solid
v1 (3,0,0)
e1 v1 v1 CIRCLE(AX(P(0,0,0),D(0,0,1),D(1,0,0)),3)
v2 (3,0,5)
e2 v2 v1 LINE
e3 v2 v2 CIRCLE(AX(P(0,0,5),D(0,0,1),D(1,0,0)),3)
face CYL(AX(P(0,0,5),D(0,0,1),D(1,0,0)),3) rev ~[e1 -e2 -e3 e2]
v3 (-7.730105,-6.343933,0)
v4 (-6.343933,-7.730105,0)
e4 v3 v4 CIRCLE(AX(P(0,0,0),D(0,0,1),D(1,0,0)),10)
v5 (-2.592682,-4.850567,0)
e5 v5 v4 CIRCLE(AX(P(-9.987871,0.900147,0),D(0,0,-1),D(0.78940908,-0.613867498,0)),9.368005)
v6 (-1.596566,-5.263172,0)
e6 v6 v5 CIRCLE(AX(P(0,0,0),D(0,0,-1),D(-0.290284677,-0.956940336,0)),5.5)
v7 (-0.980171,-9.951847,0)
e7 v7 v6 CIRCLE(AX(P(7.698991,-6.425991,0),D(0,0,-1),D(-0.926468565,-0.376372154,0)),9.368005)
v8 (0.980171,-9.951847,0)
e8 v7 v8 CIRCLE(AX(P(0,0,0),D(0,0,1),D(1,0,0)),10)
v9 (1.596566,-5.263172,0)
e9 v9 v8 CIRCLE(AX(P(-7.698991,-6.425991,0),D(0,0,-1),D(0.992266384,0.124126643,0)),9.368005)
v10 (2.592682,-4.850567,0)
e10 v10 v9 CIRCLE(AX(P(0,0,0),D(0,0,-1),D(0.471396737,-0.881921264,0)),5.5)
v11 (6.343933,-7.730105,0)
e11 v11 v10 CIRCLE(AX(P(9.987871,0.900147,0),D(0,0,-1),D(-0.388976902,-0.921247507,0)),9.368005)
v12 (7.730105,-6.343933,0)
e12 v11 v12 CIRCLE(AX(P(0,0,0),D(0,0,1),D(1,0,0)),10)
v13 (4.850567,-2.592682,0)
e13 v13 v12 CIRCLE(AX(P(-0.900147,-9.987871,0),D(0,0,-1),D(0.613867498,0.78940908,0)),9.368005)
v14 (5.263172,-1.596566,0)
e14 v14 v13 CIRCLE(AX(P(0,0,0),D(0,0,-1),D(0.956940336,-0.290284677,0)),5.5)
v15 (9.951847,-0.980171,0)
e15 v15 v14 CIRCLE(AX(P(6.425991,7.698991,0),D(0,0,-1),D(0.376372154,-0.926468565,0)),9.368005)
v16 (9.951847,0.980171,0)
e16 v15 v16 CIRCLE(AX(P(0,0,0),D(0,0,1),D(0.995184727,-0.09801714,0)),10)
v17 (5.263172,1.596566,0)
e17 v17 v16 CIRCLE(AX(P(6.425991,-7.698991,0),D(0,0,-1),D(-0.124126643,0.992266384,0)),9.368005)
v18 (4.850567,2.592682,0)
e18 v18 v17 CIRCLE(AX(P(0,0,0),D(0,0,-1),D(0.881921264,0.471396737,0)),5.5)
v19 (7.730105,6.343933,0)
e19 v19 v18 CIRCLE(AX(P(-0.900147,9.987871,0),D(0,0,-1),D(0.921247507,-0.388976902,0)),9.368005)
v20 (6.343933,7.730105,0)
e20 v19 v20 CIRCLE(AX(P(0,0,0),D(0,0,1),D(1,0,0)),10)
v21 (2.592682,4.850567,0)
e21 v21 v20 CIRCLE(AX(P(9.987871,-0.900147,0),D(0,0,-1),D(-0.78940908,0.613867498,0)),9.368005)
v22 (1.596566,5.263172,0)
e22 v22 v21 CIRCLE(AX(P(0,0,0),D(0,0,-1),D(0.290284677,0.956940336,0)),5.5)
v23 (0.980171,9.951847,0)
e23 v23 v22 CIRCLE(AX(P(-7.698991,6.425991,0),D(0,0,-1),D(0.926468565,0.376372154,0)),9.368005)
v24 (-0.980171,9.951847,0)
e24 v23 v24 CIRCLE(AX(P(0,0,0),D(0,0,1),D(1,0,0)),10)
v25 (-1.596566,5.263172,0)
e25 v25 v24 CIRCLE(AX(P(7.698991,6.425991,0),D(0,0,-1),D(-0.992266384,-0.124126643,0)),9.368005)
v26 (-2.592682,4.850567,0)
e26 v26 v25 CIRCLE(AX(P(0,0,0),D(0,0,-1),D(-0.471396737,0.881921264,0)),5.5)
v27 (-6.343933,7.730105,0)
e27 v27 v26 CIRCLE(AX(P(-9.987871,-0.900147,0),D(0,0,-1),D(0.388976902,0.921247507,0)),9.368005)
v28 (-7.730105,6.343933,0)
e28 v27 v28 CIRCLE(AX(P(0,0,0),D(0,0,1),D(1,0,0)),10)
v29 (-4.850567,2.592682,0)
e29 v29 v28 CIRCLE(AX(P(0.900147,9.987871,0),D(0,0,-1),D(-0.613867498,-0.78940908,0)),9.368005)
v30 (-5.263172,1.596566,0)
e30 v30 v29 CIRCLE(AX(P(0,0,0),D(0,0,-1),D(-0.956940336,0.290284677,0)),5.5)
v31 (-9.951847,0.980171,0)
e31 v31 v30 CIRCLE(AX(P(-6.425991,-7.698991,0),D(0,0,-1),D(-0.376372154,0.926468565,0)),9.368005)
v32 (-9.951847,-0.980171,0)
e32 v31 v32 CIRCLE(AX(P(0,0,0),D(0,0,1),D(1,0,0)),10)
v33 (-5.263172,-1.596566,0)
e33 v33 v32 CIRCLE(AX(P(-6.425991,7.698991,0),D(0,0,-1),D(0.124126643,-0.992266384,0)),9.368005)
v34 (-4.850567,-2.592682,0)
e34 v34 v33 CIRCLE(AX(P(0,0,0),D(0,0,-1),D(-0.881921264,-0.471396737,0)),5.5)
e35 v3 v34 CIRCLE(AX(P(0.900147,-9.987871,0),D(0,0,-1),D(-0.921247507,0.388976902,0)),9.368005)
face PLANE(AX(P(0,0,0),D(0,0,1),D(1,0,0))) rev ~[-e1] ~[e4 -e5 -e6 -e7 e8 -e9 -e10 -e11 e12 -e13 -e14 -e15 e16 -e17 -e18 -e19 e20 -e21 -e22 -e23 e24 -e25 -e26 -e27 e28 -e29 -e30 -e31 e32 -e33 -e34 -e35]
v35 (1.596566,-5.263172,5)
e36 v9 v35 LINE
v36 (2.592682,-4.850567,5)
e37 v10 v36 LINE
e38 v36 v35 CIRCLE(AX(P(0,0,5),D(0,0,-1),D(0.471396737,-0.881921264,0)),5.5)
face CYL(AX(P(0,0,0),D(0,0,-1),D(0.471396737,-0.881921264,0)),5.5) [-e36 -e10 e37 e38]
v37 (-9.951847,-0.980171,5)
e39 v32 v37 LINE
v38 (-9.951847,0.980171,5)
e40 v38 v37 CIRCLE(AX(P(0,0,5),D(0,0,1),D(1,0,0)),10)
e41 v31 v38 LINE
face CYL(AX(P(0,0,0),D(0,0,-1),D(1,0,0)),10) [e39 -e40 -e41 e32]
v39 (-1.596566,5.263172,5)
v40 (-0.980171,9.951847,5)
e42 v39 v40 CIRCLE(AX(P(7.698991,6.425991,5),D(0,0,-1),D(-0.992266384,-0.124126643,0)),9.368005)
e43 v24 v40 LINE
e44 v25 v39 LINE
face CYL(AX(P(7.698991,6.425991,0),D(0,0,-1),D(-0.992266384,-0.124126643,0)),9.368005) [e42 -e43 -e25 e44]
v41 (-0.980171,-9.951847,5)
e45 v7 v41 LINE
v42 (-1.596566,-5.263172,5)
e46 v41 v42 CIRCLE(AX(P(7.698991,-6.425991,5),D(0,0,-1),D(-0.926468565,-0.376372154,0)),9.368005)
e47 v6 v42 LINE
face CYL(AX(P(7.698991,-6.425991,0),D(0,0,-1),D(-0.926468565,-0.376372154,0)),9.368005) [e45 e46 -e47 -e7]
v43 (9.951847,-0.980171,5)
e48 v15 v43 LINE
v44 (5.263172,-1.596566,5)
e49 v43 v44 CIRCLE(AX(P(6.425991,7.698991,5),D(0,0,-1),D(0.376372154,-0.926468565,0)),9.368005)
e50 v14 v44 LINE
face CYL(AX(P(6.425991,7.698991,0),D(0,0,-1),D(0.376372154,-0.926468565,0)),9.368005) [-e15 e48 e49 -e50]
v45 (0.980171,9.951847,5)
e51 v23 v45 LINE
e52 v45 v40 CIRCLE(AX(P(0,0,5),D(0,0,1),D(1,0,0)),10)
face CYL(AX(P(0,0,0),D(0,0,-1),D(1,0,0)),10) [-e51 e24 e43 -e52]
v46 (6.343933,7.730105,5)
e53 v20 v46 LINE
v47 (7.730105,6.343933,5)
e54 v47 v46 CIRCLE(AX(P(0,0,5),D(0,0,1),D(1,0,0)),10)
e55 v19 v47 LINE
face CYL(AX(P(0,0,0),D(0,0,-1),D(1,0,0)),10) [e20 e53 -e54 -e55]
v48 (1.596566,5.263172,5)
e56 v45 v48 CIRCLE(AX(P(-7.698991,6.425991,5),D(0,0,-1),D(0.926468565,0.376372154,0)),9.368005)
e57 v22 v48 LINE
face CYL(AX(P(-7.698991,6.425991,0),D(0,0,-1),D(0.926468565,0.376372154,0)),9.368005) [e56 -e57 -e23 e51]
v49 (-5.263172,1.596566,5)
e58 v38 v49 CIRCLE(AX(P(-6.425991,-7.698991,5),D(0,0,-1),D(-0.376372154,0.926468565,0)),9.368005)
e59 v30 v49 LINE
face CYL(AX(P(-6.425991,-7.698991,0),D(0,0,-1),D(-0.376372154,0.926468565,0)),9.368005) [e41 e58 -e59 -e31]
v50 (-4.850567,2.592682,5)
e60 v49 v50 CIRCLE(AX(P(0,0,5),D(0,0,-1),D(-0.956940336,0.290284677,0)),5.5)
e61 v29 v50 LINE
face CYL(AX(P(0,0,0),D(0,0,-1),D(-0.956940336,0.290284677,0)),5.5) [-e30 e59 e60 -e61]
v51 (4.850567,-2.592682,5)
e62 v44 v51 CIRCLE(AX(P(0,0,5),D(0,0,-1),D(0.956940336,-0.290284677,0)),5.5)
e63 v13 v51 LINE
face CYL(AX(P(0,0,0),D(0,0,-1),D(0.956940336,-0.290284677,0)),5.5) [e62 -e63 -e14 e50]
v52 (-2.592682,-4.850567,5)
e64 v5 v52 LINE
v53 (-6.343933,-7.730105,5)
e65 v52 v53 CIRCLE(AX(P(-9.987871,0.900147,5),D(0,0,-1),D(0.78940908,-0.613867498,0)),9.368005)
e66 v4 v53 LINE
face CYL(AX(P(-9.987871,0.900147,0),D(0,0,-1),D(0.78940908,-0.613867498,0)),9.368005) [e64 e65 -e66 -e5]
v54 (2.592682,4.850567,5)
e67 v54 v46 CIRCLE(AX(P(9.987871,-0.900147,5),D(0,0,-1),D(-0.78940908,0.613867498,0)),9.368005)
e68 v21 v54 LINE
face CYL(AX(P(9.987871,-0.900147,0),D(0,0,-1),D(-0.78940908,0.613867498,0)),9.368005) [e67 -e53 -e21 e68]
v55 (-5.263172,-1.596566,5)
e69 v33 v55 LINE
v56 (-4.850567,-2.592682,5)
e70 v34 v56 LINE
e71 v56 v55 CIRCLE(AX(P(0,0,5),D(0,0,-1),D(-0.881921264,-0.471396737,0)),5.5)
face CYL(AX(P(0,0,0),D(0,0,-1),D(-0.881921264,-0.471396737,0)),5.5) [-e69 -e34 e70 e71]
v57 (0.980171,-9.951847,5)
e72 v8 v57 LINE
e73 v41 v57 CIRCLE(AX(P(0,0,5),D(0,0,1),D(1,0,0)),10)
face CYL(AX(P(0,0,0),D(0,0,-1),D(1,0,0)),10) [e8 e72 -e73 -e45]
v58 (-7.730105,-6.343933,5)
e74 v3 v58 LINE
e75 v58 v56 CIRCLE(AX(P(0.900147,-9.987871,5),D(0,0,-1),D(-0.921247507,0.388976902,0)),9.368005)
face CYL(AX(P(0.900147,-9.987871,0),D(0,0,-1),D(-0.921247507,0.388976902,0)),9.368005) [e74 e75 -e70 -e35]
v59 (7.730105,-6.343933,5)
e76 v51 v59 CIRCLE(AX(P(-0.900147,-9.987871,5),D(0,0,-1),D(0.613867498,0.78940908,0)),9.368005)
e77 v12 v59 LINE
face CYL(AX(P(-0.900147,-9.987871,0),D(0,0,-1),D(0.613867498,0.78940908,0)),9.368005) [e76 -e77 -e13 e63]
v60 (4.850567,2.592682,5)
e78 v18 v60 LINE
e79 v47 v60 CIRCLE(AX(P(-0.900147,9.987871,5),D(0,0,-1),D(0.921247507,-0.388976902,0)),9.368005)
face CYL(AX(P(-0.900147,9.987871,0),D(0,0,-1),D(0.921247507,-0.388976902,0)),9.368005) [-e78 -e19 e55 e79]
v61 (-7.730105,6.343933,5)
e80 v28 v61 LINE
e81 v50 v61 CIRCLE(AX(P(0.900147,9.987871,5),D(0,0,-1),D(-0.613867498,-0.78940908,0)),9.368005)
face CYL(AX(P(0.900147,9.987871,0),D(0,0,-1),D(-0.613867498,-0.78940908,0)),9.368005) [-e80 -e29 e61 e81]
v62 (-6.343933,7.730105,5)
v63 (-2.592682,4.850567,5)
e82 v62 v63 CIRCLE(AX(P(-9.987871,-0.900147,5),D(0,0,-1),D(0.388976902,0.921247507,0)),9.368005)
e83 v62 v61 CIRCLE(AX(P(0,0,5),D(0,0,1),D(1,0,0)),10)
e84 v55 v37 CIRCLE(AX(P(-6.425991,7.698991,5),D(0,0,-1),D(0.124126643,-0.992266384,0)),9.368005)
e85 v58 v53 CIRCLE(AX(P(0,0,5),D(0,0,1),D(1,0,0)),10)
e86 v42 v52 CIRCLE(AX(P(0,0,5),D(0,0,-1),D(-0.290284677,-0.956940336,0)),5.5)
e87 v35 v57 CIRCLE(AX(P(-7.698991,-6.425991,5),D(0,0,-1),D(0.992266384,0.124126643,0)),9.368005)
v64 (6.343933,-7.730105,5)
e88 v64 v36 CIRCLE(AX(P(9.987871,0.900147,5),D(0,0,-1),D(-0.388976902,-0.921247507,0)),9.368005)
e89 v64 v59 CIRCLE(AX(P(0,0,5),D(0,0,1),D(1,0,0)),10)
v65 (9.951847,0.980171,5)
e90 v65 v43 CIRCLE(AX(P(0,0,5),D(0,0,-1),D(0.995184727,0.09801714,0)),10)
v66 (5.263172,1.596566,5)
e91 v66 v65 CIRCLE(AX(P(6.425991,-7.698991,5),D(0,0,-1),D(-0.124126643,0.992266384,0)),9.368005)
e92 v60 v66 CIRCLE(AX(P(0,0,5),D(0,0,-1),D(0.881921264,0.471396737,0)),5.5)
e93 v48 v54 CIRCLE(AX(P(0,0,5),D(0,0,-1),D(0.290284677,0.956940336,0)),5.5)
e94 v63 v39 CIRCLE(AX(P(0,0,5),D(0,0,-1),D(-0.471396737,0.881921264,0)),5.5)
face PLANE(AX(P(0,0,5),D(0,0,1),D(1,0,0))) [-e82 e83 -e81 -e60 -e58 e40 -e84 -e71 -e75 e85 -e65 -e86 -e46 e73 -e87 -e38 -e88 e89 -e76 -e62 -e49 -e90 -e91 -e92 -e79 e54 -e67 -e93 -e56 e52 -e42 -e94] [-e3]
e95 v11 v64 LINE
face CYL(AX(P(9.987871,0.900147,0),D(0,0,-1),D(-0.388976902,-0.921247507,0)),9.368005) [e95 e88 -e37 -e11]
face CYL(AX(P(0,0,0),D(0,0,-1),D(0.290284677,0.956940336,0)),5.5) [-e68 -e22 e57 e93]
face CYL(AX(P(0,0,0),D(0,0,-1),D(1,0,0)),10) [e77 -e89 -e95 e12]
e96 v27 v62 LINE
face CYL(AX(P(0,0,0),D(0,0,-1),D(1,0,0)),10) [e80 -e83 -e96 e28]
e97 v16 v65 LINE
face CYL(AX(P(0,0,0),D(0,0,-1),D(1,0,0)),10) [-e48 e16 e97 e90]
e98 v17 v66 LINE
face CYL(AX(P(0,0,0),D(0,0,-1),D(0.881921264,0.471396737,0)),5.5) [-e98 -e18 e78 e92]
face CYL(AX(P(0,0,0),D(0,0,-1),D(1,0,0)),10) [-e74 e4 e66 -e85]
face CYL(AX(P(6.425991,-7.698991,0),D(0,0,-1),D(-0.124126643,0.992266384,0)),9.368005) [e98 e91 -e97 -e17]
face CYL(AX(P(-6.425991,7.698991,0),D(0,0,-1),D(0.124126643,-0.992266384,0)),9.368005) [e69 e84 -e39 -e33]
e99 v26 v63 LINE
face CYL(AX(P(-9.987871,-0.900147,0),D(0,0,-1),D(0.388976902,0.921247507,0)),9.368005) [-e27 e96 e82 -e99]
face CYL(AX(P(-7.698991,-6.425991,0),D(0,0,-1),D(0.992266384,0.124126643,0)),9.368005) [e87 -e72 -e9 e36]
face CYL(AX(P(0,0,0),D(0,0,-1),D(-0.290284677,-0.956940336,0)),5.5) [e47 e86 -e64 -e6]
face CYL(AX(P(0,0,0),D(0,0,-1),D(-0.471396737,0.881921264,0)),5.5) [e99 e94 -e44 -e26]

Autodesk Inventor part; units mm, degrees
sketch "Sketch1" plane through (0, 0, 0) normal (0, 0, 1) x (1, 0, 0)
  circle A0 centre (0, 0) radius 10
  dimension "d0" = 20
extrude "Extrusion1" add sketch "Sketch1" along normal blind 5
ref_plane "Work Plane2" through (0, 0, 2.5) normal (0, 0, 1) x (1, 0, 0)
sketch "Sketch2" plane through (0, 0, 0) normal (0, 0, -1) x (-1, 0, 0)
  circle A0 centre (0, 0) radius 10 projected
  circle A1 centre (0, 0) radius 8
  dimension "d3" = 16
surface extrude "Pitch Diameter" sketch "Sketch2" against normal through all shown no curves A1
ref_plane "Work Plane8" through (0, 0, 0) normal (0.9238795, 0.3826834, 0) x (0, 0, 1)
ref_plane "Work Plane9" through (0, 0, 0) normal (1, 0, 0) x (0, 1, 0)
spur gear teeth "Spur Gear" teeth 8 pitch diameter 16 tip diameter 20 root diameter 11 face width 5 start plane through (0, 0, 0) normal (0, 0, -1) x (-1, 0, 0)
sketch "Sketch3" plane through (0, 0, 5) normal (0, 0, 1) x (1, 0, 0)
  circle A0 centre (0, 0) radius 3
  dimension "d49" = 6
extrude "Extrusion2" cut sketch "Sketch3" against normal through all
equation "\"d0\" = da_da"
equation "\"d1\" = da_b"
equation "\"d3\" = da_d"
equation "\"da_da\" = 20"
equation "\"da_b\" = 5"
equation "\"da_d\" = 16"
properties part number "Spur Gear1" material "Steel"
